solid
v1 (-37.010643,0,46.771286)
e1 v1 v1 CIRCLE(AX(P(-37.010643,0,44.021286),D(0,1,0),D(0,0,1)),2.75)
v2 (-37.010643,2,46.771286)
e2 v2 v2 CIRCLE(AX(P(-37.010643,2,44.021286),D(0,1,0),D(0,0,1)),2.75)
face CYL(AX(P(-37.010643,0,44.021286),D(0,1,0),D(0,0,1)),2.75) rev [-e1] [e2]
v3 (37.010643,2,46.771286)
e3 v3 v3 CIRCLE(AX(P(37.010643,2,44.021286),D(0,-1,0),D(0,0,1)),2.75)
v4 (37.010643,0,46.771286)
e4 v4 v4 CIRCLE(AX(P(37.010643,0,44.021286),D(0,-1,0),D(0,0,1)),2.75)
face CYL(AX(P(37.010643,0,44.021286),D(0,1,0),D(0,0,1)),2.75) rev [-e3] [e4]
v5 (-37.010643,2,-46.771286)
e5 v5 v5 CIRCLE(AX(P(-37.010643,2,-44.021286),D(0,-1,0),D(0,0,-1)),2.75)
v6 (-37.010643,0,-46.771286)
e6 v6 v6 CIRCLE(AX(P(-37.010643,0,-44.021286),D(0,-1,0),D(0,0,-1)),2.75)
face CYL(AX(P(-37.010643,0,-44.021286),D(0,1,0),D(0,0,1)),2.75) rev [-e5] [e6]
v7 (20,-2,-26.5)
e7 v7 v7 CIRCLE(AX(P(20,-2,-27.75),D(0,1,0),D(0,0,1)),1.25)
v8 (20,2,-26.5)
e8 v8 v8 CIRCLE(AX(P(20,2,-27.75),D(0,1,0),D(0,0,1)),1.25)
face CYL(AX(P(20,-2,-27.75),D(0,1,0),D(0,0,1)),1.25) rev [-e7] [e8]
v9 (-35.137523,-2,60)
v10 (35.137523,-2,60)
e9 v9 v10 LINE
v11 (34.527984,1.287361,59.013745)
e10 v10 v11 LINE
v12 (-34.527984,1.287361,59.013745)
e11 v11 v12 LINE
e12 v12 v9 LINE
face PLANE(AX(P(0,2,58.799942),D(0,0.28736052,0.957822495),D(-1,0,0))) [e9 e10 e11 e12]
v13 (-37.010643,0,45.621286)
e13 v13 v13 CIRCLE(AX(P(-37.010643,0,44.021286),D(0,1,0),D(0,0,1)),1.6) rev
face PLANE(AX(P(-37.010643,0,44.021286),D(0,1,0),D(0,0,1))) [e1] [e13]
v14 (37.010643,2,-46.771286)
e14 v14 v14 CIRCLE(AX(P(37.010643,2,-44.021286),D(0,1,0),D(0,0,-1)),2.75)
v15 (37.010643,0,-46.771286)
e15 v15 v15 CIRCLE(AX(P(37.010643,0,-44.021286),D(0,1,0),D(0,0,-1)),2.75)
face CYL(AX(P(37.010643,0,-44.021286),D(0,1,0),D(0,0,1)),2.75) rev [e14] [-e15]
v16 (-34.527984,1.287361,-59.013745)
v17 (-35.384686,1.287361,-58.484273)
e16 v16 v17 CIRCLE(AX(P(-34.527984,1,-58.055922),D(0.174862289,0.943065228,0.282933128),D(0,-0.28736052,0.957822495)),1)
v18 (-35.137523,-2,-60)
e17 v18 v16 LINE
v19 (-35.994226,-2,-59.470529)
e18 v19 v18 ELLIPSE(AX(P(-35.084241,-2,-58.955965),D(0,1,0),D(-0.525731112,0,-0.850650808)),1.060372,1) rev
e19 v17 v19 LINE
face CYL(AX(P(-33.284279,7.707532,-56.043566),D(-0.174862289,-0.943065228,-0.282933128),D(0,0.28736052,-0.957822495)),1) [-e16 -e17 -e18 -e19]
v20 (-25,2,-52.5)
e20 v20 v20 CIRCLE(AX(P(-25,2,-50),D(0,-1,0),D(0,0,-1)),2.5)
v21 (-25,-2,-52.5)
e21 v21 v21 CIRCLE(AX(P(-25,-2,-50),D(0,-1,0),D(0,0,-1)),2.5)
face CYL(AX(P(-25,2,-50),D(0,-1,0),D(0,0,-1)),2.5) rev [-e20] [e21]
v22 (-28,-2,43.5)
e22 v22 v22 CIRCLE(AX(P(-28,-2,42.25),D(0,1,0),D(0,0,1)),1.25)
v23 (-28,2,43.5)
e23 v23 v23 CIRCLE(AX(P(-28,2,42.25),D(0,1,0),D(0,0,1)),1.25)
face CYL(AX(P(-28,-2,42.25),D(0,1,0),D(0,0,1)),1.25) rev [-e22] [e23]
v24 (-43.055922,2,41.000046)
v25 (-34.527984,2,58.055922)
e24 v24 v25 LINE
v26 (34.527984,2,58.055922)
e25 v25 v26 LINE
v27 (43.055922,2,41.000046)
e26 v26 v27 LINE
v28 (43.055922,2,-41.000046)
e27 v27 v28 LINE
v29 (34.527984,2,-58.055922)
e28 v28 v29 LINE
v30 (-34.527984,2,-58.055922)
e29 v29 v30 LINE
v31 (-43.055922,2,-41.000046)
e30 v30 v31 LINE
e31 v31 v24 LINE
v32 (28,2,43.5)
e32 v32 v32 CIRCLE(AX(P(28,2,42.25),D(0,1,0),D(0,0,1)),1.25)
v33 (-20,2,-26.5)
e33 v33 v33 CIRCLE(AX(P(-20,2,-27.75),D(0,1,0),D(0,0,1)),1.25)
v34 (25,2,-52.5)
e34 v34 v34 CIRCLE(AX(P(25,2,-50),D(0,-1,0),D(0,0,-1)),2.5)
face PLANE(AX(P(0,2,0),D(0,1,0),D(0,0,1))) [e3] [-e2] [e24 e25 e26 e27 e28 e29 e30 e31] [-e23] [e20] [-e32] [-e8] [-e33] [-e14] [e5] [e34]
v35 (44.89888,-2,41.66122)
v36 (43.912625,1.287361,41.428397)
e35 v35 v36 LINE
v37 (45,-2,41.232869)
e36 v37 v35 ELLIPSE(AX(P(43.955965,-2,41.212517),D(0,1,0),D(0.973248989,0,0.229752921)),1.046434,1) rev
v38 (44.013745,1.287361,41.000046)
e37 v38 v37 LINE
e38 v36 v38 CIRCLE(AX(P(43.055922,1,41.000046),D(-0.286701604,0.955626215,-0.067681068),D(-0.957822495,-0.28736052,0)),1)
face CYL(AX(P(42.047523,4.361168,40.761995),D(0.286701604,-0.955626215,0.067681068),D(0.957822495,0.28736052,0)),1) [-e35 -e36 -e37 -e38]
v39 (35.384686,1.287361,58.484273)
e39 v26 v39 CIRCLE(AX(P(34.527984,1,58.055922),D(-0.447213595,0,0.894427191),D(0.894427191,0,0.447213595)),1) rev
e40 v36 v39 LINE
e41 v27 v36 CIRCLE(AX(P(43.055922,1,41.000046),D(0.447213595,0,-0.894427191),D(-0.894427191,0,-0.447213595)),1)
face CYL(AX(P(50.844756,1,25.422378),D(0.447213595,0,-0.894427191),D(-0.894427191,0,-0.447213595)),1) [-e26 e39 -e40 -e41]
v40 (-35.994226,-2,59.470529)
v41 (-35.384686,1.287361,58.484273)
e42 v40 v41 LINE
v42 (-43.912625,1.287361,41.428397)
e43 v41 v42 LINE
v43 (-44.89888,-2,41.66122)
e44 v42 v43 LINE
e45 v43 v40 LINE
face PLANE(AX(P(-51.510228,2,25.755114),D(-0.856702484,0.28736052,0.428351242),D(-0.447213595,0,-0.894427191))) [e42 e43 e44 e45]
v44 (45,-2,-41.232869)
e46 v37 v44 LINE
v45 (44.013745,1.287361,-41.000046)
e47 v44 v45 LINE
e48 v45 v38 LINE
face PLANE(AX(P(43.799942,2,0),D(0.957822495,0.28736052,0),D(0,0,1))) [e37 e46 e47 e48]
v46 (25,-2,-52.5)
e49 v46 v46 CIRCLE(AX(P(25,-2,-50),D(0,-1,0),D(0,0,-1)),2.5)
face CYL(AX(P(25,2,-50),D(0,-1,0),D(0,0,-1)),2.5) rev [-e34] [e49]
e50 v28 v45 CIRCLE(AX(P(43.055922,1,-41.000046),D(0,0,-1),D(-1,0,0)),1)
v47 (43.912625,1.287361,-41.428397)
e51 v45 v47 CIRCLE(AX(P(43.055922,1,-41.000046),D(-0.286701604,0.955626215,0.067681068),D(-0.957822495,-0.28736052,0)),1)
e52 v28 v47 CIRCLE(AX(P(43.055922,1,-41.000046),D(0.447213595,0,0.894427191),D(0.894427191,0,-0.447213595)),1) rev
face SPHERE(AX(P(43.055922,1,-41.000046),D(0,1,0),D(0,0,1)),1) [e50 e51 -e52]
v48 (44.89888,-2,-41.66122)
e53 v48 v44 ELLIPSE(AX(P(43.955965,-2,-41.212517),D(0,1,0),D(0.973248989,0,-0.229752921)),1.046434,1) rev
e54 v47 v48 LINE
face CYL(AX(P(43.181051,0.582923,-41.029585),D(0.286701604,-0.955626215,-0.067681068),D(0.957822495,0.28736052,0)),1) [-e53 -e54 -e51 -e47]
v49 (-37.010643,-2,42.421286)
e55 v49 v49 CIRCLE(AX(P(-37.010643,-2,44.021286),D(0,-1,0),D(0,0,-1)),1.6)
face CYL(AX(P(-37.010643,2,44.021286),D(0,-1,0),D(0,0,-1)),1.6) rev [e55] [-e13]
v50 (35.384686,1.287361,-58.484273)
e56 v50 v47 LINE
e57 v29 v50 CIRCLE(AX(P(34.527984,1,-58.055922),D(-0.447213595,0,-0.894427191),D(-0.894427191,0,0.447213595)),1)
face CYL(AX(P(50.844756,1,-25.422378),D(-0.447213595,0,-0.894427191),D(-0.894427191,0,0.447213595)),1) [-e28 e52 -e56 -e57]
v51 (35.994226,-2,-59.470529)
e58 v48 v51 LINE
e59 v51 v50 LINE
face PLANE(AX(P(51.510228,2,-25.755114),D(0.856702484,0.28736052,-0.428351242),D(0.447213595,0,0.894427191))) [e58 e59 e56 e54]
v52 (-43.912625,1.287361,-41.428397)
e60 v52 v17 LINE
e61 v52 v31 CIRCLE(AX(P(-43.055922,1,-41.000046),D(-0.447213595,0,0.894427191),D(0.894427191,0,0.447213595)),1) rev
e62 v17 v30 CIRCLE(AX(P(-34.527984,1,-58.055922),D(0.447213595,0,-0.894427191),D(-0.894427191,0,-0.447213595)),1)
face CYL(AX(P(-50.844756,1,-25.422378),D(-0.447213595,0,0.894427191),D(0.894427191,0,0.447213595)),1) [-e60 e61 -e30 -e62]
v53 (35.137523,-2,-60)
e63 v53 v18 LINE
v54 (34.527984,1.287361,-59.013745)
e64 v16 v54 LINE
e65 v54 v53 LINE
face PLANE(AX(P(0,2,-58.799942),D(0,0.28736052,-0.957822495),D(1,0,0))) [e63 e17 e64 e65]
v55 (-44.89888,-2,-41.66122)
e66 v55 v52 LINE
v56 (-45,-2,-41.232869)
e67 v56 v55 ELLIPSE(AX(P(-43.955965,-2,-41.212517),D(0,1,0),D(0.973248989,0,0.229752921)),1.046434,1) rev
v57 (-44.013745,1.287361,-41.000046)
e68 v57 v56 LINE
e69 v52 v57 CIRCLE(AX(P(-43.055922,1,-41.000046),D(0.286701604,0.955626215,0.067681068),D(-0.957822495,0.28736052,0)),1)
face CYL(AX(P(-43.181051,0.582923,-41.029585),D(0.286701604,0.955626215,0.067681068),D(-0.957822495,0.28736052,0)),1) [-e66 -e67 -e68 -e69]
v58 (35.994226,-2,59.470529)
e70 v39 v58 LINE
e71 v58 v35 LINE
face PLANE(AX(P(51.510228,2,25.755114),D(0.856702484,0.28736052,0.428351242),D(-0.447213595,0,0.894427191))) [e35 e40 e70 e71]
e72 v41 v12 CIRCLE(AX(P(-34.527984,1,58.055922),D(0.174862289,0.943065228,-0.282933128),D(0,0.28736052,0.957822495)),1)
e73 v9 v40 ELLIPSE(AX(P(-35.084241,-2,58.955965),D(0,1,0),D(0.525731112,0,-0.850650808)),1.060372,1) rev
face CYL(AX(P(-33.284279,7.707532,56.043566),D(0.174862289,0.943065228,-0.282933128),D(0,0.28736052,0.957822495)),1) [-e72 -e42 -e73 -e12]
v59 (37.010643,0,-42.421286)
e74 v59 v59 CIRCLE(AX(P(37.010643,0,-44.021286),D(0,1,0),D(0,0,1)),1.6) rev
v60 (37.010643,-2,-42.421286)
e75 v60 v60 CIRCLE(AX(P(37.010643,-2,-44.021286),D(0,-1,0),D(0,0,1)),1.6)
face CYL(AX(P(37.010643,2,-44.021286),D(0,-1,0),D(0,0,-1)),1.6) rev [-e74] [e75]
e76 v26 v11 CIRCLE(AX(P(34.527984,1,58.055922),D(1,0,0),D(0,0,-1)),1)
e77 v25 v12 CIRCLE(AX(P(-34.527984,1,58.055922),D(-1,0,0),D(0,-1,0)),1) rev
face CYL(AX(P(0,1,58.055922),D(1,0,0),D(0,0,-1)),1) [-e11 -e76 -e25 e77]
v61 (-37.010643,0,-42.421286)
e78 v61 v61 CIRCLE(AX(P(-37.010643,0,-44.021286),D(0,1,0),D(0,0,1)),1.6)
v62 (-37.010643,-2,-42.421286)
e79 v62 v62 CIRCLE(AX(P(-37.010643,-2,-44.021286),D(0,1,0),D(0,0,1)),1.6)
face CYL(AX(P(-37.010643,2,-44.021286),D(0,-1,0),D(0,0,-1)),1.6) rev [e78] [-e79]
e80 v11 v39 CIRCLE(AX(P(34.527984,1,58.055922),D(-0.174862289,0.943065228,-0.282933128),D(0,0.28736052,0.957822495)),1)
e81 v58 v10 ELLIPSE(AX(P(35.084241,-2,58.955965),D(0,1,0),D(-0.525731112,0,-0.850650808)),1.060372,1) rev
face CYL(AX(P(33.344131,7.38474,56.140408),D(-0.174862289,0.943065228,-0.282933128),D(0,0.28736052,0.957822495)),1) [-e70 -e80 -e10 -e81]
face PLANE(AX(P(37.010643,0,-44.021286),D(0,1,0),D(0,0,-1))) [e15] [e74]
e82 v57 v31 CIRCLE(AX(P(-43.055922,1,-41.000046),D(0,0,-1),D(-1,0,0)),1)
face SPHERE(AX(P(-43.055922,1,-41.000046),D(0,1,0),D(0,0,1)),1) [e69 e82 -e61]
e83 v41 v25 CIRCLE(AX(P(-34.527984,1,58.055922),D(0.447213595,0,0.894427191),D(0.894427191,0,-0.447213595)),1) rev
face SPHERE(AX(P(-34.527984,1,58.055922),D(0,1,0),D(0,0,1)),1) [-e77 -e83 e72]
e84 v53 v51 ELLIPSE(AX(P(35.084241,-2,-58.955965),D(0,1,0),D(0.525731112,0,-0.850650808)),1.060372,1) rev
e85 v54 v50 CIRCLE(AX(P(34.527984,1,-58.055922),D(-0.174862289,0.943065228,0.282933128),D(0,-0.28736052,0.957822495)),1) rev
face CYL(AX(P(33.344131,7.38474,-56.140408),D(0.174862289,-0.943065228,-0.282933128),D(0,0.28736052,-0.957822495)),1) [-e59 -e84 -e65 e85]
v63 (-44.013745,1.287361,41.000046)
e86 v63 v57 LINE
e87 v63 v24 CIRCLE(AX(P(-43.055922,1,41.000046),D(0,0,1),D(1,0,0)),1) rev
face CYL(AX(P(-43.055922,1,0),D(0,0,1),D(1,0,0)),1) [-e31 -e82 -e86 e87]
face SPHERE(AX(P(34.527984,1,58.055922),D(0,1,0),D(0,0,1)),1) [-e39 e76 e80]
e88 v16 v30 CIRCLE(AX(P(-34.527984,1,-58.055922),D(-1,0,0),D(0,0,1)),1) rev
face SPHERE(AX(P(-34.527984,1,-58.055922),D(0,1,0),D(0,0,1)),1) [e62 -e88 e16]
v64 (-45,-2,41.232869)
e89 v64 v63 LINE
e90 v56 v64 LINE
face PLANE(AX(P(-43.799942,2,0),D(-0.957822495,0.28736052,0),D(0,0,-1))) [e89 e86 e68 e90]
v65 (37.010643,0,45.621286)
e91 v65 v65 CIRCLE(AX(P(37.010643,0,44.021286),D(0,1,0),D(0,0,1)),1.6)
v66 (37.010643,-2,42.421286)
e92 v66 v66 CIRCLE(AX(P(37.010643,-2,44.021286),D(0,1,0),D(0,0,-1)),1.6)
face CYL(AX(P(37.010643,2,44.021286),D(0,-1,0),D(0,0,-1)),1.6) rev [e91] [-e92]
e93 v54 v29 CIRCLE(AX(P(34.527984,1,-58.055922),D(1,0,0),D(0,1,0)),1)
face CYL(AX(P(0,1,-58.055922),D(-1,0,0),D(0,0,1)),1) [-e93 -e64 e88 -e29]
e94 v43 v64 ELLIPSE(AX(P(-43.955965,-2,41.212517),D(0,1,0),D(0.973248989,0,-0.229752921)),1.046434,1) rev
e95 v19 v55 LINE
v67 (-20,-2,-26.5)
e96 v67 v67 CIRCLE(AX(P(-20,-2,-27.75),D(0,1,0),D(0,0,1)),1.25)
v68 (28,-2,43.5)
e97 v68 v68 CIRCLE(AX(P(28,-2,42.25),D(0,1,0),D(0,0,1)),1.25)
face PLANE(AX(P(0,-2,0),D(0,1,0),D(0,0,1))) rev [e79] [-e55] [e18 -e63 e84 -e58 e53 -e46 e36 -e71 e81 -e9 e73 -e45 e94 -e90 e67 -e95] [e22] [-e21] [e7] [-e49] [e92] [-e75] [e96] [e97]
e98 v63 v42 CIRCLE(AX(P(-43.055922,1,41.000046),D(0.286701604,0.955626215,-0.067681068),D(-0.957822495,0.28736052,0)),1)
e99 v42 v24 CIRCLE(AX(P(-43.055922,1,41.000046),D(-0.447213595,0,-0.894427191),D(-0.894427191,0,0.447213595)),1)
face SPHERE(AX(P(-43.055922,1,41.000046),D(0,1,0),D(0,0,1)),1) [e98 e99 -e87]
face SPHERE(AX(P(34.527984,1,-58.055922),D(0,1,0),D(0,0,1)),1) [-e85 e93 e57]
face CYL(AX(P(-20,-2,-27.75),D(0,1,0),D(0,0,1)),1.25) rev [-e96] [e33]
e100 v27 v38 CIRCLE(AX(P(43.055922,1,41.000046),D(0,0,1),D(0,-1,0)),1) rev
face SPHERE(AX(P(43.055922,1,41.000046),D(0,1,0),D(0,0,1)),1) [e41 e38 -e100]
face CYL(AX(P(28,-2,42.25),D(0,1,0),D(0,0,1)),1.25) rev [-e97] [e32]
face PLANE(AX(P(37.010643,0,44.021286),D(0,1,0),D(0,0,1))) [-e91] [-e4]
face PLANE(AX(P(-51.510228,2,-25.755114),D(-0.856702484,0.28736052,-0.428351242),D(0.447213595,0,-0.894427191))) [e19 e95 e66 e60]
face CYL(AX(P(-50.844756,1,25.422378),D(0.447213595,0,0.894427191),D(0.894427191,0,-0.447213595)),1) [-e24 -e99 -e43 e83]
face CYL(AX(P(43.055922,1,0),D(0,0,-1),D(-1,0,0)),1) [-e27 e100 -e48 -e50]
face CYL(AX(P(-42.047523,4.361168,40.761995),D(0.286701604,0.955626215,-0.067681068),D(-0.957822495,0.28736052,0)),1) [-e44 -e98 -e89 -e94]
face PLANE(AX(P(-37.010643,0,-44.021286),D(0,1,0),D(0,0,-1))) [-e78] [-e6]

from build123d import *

# Parameters (mm, degrees)
BOSS_EXTRUDE1_DEPTH     = 2
CHAMFER1_SIZE           = 4
CHAMFER1_SIZE_2         = 1.200057511
SKETCH2_R               = 1.6
CUT_EXTRUDE1_DEPTH      = 76.106590923
SKETCH3_R               = 2.75
CUT_EXTRUDE2_DEPTH      = 2
MIRROR2_COPY_1_SKETCH_R = 1.6
MIRROR2_COPY_1_DEPTH    = 76.106590923
MIRROR2_COPY_2_SKETCH_R = 2.75
MIRROR2_COPY_2_DEPTH    = 2
FILLET1_R               = 1
SKETCH4_R               = 1.25
CUT_EXTRUDE3_DEPTH      = 76.106590923
SKETCH5_R               = 2.5
CUT_EXTRUDE4_DEPTH      = 76.106590923


with BuildPart() as part:
    # Sketch1 → Boss-Extrude1 (new, symmetric)
    with BuildSketch(Plane(origin=(0, 0, 0), x_dir=(1, 0, 0), z_dir=(0, 1, 0))):
        Polygon((-45, -41.45898034), (-35.72949017, -60), (35.72949017, -60), (45, -41.45898034), (45, 41.45898034), (35.72949017, 60), (-35.72949017, 60), (-45, 41.45898034), align=None)
    extrude(amount=BOSS_EXTRUDE1_DEPTH, both=True)

    # Chamfer1
    # the kernel refuses this chamfer: 4, 1.200057511 mm, written as the material it takes off along each edge
    with BuildSketch(Plane(origin=(-31.085729195, 2, -69.28752195), x_dir=(-0.0099009581726386, -0.9999387300150343, -0.004950479086319294), z_dir=(-0.44721359549995754, 0, 0.8944271909999161)), Plane(origin=(49.643760975, 2, -32.17145839), x_dir=(0.009900958172639964, -0.9999387300150343, -0.004950479086319981), z_dir=(-0.4472135954999578, 0, -0.894427190999916)), Plane(origin=(31.085729195, 2, 69.28752195), x_dir=(0.009900958172639964, -0.9999387300150343, 0.004950479086319981), z_dir=(0.4472135954999578, 0, -0.894427190999916)), Plane(origin=(-49.643760975, 2, 32.17145839), x_dir=(-0.009900958172639964, -0.9999387300150343, 0.004950479086319981), z_dir=(0.4472135954999578, 0, 0.894427190999916))) as chamfer1_piece_1:
        Polygon((CHAMFER1_SIZE * 0.999938730015, CHAMFER1_SIZE * 0.0110696077582), (-CHAMFER1_SIZE_2 * 0.0110696077607, CHAMFER1_SIZE_2 * 0.999938730237), (0, 0), align=None)
    extrude(amount=41.497020588, mode=Mode.SUBTRACT)
    with BuildSketch(Plane(origin=(46.113255381, 2, -60), x_dir=(0, -0.9999387300150343, -0.011069607758202806), z_dir=(-1, 0, 0))) as chamfer1_piece_2:
        Polygon((CHAMFER1_SIZE * 0.999938730015, CHAMFER1_SIZE * 0.0110696077582), (-CHAMFER1_SIZE_2 * 0.0110696077607, CHAMFER1_SIZE_2 * 0.999938730237), (0, 0), align=None)
    extrude(amount=92.226510762, mode=Mode.SUBTRACT)
    with BuildSketch(Plane(origin=(45, 2, 51.842745551), x_dir=(0.011069607758202806, -0.9999387300150343, 0), z_dir=(0, 0, -1)), Plane(origin=(-45, 2, -51.842745551), x_dir=(-0.011069607758202806, -0.9999387300150343, 0), z_dir=(0, 0, 1))) as chamfer1_piece_3:
        Polygon((CHAMFER1_SIZE * 0.999938730015, CHAMFER1_SIZE * 0.0110696077582), (-CHAMFER1_SIZE_2 * 0.0110696077607, CHAMFER1_SIZE_2 * 0.999938730237), (0, 0), align=None)
    extrude(amount=103.685491102, mode=Mode.SUBTRACT)
    with BuildSketch(Plane(origin=(-46.113255381, 2, 60), x_dir=(0, 0.12207157319780508, -0.9925213000319), z_dir=(1, 0, 0))) as chamfer1_piece_4:
        Polygon((CHAMFER1_SIZE_2 * 0.992521300252, -CHAMFER1_SIZE_2 * 0.122071573225), (-CHAMFER1_SIZE * 0.122071573198, -CHAMFER1_SIZE * 0.992521300032), (0, 0), align=None)
    extrude(amount=92.226510762, mode=Mode.SUBTRACT)

    # Sketch2 → Cut-Extrude1 (cut, through all)
    with BuildSketch(Plane.XZ.offset(2)):
        with Locations(Location((-37.010643118, 44.021286236, 0), (0, 0, 270))):
            Circle(SKETCH2_R)
    cut_extrude1 = extrude(amount=-CUT_EXTRUDE1_DEPTH, mode=Mode.SUBTRACT)

    # Sketch3 → Cut-Extrude2 (cut)
    with BuildSketch(Plane(origin=(0, 2, 0), x_dir=(1, 0, 0), z_dir=(0, 1, 0))):
        with Locations(Location((-37.010643118, -44.021286236, 0), (0, 0, 270))):
            Circle(SKETCH3_R)
    cut_extrude2 = extrude(amount=-CUT_EXTRUDE2_DEPTH, mode=Mode.SUBTRACT)

    # Mirror1: Cut-Extrude1, Cut-Extrude2 across plane
    add(cut_extrude1.mirror(Plane(origin=(0, 0, 0), x_dir=(0, 0, 1), z_dir=(1, 0, 0))), mode=Mode.SUBTRACT)
    add(cut_extrude2.mirror(Plane(origin=(0, 0, 0), x_dir=(0, 0, 1), z_dir=(1, 0, 0))), mode=Mode.SUBTRACT)

    # Mirror2: Cut-Extrude1, Cut-Extrude2 across plane
    add(cut_extrude1.mirror(Plane.XY), mode=Mode.SUBTRACT)
    add(cut_extrude2.mirror(Plane.XY), mode=Mode.SUBTRACT)

    # Mirror2 copy 1 sketch → Mirror2 copy 1 (cut, through all)
    with BuildSketch(Plane(origin=(0, -2, 0), x_dir=(-1, 0, 0), z_dir=(0, -1, 0))):
        with Locations(Location((-37.010643118, 44.021286236, 0), (0, 0, 270))):
            Circle(MIRROR2_COPY_1_SKETCH_R)
    extrude(amount=-MIRROR2_COPY_1_DEPTH, mode=Mode.SUBTRACT)

    # Mirror2 copy 2 sketch → Mirror2 copy 2 (cut)
    with BuildSketch(Plane(origin=(0, 2, 0), x_dir=(-1, 0, 0), z_dir=(0, 1, 0))):
        with Locations(Location((-37.010643118, -44.021286236, 0), (0, 0, 270))):
            Circle(MIRROR2_COPY_2_SKETCH_R)
    extrude(amount=-MIRROR2_COPY_2_DEPTH, mode=Mode.SUBTRACT)

    # Fillet1
    fillet1_edges = [part.edges().sort_by_distance(p)[0] for p in [
        (-43.799942489, 2, 0),
        (-39.393878164, 2, 49.98781384),
        (0, 2, 58.799942489),
        (39.393878164, 2, 49.98781384),
        (43.799942489, 2, 0),
        (39.393878164, 2, -49.98781384),
        (0, 2, -58.799942489),
        (-39.393878164, 2, -49.98781384),
        (44.399971244, 0, 41.317332765),
        (35.358652005, 0, 59.399971244),
        (44.399971244, 0, -41.317332765),
        (-35.358652005, 0, 59.399971244),
        (35.358652005, 0, -59.399971244),
        (-44.399971244, 0, 41.317332765),
        (-35.358652005, 0, -59.399971244),
        (-44.399971244, 0, -41.317332765),
    ]]
    fillet(fillet1_edges, radius=FILLET1_R)

    # Sketch4 → Cut-Extrude3 (cut, through all)
    with BuildSketch(Plane(origin=(0, 2, 0), x_dir=(1, 0, 0), z_dir=(0, 1, 0))):
        with Locations(Location((-20, 27.75, 0), (0, 0, 270))):
            Circle(SKETCH4_R)
        with Locations(Location((-28, -42.25, 0), (0, 0, 270))):
            Circle(SKETCH4_R)
        with Locations(Location((20, 27.75, 0), (0, 0, 270))):
            Circle(SKETCH4_R)
        with Locations(Location((28, -42.25, 0), (0, 0, 270))):
            Circle(SKETCH4_R)
    extrude(amount=-CUT_EXTRUDE3_DEPTH, mode=Mode.SUBTRACT)

    # Sketch5 → Cut-Extrude4 (cut, through all)
    with BuildSketch(Plane.XZ.offset(2)):
        with Locations(Location((25, -50, 0), (0, 0, 270))):
            Circle(SKETCH5_R)
        with Locations(Location((-25, -50, 0), (0, 0, 270))):
            Circle(SKETCH5_R)
    extrude(amount=-CUT_EXTRUDE4_DEPTH, mode=Mode.SUBTRACT)


solid = part.part
